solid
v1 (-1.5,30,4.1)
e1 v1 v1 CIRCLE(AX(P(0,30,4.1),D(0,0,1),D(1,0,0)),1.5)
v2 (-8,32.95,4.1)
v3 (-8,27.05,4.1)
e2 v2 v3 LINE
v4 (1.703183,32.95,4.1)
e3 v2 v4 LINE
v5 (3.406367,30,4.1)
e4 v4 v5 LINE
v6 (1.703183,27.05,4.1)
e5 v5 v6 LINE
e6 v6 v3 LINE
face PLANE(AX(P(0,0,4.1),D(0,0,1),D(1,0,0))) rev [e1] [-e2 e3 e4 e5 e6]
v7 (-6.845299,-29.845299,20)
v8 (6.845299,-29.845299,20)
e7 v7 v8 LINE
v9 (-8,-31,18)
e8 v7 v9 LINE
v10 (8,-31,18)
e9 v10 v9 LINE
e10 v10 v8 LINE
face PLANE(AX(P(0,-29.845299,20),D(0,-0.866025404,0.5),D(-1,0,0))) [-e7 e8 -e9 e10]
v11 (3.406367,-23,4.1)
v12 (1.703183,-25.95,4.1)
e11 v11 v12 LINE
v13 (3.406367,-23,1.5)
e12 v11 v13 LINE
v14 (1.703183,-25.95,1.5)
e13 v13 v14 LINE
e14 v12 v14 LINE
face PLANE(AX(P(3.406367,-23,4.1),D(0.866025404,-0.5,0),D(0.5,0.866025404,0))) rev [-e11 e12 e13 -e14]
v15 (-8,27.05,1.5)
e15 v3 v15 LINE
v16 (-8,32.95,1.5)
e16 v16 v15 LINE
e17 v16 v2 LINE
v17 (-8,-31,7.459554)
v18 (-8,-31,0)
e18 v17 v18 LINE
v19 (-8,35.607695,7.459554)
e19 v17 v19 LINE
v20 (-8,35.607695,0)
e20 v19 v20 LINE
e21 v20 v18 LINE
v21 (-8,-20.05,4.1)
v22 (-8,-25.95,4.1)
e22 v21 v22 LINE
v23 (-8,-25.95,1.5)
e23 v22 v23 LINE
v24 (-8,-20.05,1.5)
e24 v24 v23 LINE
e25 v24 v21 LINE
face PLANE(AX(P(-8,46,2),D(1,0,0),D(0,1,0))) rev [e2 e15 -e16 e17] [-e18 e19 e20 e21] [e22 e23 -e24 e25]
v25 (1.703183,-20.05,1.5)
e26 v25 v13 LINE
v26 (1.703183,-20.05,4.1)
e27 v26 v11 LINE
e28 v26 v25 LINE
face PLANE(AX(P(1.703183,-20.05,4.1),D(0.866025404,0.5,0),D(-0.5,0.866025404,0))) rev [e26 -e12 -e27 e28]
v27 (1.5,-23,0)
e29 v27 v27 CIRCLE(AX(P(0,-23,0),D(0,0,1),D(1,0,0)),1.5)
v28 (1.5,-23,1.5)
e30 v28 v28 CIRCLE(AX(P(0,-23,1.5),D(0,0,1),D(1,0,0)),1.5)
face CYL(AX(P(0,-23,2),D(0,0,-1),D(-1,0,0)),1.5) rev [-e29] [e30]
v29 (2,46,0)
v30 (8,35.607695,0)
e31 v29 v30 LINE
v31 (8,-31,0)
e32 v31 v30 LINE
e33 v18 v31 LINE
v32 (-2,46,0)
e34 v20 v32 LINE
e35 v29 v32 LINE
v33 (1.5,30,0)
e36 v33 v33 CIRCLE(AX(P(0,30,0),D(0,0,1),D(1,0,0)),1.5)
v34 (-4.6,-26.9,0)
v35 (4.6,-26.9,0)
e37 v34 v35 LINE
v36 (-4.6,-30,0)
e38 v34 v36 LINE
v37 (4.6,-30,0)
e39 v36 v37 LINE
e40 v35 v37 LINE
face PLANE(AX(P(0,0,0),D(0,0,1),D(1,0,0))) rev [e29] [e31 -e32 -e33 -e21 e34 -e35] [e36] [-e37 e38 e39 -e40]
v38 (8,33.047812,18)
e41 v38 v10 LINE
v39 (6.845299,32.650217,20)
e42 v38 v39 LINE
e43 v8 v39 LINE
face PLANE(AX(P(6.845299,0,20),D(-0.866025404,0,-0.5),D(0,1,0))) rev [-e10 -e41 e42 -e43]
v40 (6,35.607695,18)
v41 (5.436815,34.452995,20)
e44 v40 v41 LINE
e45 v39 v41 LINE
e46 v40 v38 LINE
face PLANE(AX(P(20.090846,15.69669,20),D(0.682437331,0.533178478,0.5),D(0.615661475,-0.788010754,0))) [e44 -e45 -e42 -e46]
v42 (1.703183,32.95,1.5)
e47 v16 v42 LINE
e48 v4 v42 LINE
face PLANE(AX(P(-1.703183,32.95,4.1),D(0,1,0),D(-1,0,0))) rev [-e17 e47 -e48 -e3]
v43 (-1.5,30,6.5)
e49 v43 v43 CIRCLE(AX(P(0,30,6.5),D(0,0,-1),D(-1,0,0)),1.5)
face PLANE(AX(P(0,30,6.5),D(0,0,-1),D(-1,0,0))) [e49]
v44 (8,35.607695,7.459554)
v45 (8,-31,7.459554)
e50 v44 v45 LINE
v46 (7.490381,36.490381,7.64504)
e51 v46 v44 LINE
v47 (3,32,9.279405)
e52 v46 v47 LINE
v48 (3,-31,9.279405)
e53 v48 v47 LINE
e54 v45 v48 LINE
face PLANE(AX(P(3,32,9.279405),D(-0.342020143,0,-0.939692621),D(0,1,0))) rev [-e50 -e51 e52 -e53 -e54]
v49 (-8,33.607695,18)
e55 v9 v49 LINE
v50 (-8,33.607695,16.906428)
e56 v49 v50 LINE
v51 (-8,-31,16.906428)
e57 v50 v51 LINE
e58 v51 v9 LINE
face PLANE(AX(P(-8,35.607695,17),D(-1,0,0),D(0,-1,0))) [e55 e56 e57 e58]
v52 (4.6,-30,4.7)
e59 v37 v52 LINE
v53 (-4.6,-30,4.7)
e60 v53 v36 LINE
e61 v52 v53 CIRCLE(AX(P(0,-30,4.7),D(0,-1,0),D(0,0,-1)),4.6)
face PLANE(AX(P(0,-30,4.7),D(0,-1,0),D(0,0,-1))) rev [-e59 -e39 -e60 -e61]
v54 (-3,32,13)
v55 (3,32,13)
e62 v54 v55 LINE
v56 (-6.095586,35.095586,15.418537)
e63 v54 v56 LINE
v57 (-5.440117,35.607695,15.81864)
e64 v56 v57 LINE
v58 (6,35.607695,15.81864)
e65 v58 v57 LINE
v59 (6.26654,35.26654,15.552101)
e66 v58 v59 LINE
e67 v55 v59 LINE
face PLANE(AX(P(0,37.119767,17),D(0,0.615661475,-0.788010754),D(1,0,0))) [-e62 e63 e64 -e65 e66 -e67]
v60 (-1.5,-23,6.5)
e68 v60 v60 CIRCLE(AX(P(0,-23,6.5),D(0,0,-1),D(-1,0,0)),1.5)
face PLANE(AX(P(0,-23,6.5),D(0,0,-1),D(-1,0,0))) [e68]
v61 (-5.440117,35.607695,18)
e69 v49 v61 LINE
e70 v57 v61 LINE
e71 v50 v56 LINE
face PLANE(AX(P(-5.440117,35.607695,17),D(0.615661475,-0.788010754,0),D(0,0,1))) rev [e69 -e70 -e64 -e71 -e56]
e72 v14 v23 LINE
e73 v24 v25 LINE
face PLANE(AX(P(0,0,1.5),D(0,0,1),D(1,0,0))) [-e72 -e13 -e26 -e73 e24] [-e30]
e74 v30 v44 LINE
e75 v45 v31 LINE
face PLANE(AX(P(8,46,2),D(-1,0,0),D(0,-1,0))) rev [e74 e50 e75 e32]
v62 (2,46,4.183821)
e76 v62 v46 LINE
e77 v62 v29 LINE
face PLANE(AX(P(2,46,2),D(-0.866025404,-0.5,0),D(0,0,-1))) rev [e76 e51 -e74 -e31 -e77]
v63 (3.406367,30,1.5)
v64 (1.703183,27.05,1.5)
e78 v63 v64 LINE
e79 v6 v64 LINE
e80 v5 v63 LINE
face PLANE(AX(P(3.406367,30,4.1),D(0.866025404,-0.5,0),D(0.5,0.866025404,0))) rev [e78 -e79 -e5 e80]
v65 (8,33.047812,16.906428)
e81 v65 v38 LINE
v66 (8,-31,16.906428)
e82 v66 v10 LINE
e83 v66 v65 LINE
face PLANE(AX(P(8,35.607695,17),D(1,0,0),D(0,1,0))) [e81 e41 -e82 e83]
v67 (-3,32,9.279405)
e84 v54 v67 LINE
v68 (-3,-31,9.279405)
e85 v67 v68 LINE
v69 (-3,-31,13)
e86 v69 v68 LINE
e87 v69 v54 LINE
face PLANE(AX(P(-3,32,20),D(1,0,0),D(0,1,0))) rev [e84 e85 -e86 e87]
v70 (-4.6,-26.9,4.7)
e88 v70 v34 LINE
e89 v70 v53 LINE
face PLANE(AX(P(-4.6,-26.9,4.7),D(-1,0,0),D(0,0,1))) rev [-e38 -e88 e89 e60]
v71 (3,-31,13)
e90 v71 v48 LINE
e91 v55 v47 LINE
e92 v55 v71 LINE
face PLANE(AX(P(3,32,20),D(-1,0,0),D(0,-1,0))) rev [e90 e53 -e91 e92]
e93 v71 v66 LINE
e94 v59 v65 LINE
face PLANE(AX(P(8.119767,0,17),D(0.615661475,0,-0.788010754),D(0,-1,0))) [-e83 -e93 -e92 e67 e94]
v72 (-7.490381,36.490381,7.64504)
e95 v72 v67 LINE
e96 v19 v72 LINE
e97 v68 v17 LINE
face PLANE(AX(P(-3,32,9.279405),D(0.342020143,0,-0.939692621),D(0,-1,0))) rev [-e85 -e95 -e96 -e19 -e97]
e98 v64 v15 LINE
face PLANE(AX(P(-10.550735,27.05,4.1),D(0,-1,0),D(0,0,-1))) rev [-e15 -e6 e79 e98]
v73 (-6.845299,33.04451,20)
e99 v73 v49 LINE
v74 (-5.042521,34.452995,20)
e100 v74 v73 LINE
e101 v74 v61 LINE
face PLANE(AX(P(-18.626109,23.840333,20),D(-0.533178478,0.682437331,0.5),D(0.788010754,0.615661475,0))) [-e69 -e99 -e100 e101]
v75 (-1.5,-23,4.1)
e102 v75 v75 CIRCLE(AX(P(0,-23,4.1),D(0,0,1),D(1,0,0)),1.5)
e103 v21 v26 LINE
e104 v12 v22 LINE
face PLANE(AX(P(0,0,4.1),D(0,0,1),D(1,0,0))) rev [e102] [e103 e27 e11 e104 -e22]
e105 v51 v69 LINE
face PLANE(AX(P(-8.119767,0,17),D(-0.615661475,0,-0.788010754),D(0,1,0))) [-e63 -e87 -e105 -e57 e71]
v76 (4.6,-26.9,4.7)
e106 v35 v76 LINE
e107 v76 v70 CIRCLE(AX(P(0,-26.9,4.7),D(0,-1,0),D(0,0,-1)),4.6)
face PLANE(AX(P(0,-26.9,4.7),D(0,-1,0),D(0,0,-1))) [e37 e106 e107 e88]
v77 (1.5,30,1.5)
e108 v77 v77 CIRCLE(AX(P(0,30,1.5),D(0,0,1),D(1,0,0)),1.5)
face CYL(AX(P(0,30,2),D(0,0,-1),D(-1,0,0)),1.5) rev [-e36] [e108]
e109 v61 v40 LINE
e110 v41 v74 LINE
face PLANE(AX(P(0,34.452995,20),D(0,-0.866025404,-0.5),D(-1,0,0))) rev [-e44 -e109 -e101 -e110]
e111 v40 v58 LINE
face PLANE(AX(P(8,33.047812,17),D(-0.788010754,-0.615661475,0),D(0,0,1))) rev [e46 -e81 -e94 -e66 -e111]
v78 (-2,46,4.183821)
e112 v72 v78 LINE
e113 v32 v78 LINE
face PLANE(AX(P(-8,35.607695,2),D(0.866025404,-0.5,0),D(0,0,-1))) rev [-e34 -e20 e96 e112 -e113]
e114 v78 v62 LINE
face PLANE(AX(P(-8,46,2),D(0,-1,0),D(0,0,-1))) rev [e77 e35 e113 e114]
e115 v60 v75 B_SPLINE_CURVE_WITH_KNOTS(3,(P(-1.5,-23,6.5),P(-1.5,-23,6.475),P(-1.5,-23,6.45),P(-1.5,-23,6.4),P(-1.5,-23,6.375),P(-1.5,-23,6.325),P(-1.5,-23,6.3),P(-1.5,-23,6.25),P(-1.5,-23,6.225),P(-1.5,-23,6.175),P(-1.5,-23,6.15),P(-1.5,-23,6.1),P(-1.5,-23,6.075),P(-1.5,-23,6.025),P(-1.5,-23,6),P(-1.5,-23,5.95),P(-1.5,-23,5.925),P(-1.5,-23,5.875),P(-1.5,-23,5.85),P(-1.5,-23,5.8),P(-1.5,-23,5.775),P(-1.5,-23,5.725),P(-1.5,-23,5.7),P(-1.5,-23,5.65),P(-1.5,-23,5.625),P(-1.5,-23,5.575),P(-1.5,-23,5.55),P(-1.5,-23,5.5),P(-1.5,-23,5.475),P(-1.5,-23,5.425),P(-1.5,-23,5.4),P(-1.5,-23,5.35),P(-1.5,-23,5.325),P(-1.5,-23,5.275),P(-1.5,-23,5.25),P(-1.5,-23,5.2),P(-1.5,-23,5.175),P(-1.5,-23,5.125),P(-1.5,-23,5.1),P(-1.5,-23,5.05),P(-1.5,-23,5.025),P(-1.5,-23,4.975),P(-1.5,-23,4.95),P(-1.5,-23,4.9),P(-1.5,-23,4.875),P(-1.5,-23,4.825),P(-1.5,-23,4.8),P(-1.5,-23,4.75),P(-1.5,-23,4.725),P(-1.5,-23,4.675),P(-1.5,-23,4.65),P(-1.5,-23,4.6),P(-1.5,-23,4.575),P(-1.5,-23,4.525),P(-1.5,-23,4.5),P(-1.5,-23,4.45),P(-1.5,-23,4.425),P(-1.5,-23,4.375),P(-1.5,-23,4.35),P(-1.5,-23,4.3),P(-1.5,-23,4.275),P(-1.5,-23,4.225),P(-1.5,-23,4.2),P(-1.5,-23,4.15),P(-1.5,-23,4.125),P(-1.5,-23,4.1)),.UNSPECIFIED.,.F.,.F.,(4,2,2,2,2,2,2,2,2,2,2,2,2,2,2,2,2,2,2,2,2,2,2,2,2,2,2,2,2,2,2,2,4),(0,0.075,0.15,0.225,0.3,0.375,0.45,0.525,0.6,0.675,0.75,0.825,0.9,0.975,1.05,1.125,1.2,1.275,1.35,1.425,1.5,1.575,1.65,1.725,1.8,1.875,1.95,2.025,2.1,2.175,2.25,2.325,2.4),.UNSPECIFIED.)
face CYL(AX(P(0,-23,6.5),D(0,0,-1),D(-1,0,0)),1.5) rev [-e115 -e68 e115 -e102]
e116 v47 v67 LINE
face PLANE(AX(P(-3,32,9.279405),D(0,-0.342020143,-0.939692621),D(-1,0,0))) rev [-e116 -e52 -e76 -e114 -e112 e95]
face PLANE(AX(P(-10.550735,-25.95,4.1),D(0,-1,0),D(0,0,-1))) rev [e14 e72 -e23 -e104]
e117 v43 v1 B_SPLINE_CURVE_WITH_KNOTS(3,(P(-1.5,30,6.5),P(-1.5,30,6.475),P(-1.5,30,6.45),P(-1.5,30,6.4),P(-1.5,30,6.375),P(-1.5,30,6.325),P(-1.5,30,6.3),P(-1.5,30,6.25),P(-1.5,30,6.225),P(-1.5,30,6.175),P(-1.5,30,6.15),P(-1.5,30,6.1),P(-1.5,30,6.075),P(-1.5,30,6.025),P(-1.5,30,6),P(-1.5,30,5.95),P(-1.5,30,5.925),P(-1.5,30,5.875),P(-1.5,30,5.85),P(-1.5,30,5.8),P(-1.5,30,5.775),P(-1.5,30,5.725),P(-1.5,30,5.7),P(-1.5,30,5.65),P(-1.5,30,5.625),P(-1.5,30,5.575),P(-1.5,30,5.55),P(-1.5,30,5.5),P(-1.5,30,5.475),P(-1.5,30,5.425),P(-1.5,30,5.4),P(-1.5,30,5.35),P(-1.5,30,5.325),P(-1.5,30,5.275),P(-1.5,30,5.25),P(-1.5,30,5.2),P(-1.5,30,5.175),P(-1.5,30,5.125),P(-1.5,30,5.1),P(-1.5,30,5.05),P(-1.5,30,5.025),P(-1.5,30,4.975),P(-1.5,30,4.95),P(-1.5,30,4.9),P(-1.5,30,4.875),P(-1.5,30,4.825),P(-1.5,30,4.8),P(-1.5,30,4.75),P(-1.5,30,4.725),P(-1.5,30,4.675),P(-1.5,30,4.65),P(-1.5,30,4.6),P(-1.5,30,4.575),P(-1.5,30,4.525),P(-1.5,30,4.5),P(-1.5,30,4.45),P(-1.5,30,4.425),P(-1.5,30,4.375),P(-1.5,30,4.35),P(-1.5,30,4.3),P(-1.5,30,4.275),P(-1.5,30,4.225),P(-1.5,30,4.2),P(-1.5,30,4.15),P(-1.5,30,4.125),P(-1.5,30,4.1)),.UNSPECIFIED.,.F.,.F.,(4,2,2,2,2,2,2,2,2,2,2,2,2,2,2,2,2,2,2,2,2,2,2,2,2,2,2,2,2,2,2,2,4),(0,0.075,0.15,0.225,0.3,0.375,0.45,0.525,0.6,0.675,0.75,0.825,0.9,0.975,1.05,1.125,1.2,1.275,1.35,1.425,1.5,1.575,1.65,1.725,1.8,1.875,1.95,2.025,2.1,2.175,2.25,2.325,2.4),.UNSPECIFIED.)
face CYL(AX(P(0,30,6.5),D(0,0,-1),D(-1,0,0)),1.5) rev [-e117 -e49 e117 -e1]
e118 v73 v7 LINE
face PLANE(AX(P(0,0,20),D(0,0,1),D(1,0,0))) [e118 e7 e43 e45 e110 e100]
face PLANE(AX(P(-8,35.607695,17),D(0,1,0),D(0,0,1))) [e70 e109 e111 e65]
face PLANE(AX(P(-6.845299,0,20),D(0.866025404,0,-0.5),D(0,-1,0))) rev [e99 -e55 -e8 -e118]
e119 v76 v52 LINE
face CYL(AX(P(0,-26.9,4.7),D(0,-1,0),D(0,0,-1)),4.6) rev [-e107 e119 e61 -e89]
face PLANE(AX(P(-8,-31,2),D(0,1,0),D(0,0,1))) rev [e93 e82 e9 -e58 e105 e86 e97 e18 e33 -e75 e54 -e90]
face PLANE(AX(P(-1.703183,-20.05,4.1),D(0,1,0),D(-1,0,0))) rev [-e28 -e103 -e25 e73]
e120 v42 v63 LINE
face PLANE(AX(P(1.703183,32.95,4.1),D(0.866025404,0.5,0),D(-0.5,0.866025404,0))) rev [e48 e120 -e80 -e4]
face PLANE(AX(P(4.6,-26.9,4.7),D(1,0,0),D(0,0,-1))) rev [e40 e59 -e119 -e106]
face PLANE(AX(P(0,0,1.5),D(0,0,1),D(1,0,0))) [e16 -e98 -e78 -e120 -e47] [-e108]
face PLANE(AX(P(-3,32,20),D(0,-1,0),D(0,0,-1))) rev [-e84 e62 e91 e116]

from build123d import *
from OCP.BRepFilletAPI import BRepFilletAPI_MakeChamfer

# Parameters (mm, degrees)
SKETCH1_W           = 16
SKETCH1_H           = 77
SKETCH1_R           = 1.5
BOSS_EXTRUDE1_DEPTH = 2
CHAMFER1_SIZE       = 6
CHAMFER1_SIZE2      = 10.392304845
SKETCH2_W           = 6
SKETCH2_H           = 63
BOSS_EXTRUDE2_DEPTH = 18
CHAMFER2_SIZE       = 20
CHAMFER2_SIZE_2     = 7.279404685
SKETCH3_W           = 16
SKETCH3_H           = 66.607695155
BOSS_EXTRUDE3_DEPTH = 3
CHAMFER3_SIZE       = 5.119766529
CHAMFER3_SIZE_2     = 4
CHAMFER4_SIZE       = 2
CHAMFER4_SIZE2      = 2.559883264
CHAMFER6_SIZE       = 2
CHAMFER6_SIZE2      = 1.154700538
CUT_EXTRUDE1_DEPTH  = 2.6
CUT_EXTRUDE3_DEPTH  = 3.1
SKETCH9_R           = 1.5
CUT_EXTRUDE_3_DEPTH = 6.5


with BuildPart() as part:
    # Sketch1 → Boss-Extrude1 (new body)
    with BuildSketch(Plane.XY):
        with Locations((0, 7.5)):
            Rectangle(SKETCH1_W, SKETCH1_H)
        with Locations((0, 30)):
            Circle(SKETCH1_R, mode=Mode.SUBTRACT)
        with Locations((0, -23)):
            Circle(SKETCH1_R, mode=Mode.SUBTRACT)
    extrude(amount=BOSS_EXTRUDE1_DEPTH)

    # Chamfer1
    chamfer1_edges = [part.edges().sort_by_distance(p)[0] for p in [
        (-8, 46, 1),
        (8, 46, 1),
    ]]
    chamfer1_side = [part.faces().sort_by_distance(p)[0] for p in [
        (0, 46, 1),
    ]]
    chamfer(chamfer1_edges, length=CHAMFER1_SIZE, length2=CHAMFER1_SIZE2, reference=chamfer1_side[0])

    # Sketch2 → Boss-Extrude2 (add)
    with BuildSketch(Plane.XY.offset(2)):
        with Locations((0, 0.5)):
            Rectangle(SKETCH2_W, SKETCH2_H)
    extrude(amount=BOSS_EXTRUDE2_DEPTH)

    # Chamfer2
    # the kernel refuses this chamfer: 20, 7.279404685 mm, written as the material it adds along each edge
    with BuildSketch(Plane(origin=(3, 32, 2), x_dir=(0.9999130865277317, 0, -0.013184058198645935), z_dir=(0, -1, 0))) as chamfer2_piece_1_section:
        Polygon((CHAMFER2_SIZE * 0.999913086528, CHAMFER2_SIZE * 0.0131840581986), (-CHAMFER2_SIZE_2 * 0.0131840581992, CHAMFER2_SIZE_2 * 0.999913086572), (0, 0), align=None)
    chamfer2_piece_1 = extrude(amount=63, mode=Mode.PRIVATE)
    chamfer2_piece_1 = split(chamfer2_piece_1, bisect_by=Plane(origin=(8, 0.5, 5.171623494), z_dir=(-1, 0, 0)), keep=Keep.TOP, mode=Mode.PRIVATE)
    add(chamfer2_piece_1)
    with BuildSketch(Plane(origin=(-3, -31, 2), x_dir=(-0.9999130865277317, 0, -0.013184058198645935), z_dir=(0, 1, 0))) as chamfer2_piece_2_section:
        Polygon((CHAMFER2_SIZE * 0.999913086528, CHAMFER2_SIZE * 0.0131840581986), (-CHAMFER2_SIZE_2 * 0.0131840581992, CHAMFER2_SIZE_2 * 0.999913086572), (0, 0), align=None)
    chamfer2_piece_2 = extrude(amount=63, mode=Mode.PRIVATE)
    chamfer2_piece_2 = split(chamfer2_piece_2, bisect_by=Plane(origin=(-8, 0.5, 5.171623494), z_dir=(1, 0, 0)), keep=Keep.TOP, mode=Mode.PRIVATE)
    add(chamfer2_piece_2)
    with BuildSketch(Plane(origin=(-3, 32, 2), x_dir=(0, 0.9999130865277315, -0.01318405819864593), z_dir=(1, 0, 0))) as chamfer2_piece_3_section:
        Polygon((CHAMFER2_SIZE * 0.999913086528, CHAMFER2_SIZE * 0.0131840581986), (-CHAMFER2_SIZE_2 * 0.0131840581992, CHAMFER2_SIZE_2 * 0.999913086572), (0, 0), align=None)
    chamfer2_piece_3 = extrude(amount=6, mode=Mode.PRIVATE)
    chamfer2_piece_3 = split(chamfer2_piece_3, bisect_by=Plane(origin=(0, 46, 4.508624661), z_dir=(0, -1, 0)), keep=Keep.TOP, mode=Mode.PRIVATE)
    chamfer2_piece_3 = split(chamfer2_piece_3, bisect_by=Plane(origin=(-5.203873062, 40.450729076, 4.508624661), z_dir=(0.8660254037844399, -0.49999999999999795, 0)), keep=Keep.TOP, mode=Mode.PRIVATE)
    chamfer2_piece_3 = split(chamfer2_piece_3, bisect_by=Plane(origin=(5.203873062, 40.450729076, 4.508624661), z_dir=(-0.8660254037844398, -0.499999999999998, 0)), keep=Keep.TOP, mode=Mode.PRIVATE)
    add(chamfer2_piece_3)
    with BuildSketch(Plane(origin=(-3, 32, 2), x_dir=(0, 0.9999130865277315, -0.01318405819864593), z_dir=(1, 0, 0))) as chamfer2_piece_4a_section:
        Polygon((CHAMFER2_SIZE * 0.999913086528, CHAMFER2_SIZE * 0.0131840581986), (-CHAMFER2_SIZE_2 * 0.0131840581992, CHAMFER2_SIZE_2 * 0.999913086572), (0, 0), align=None)
    chamfer2_piece_4a = extrude(amount=57.883894651, mode=Mode.PRIVATE)
    chamfer2_piece_4a = split(chamfer2_piece_4a, bisect_by=Plane(origin=(7.316315987, 36.791870601, 4.879553829), z_dir=(-0.8660254037844398, -0.499999999999998, 0)), keep=Keep.TOP, mode=Mode.PRIVATE)
    chamfer2_piece_4a = split(chamfer2_piece_4a, bisect_by=Plane(origin=(8, 35.552510025, 4.879553829), z_dir=(-1, 0, 0)), keep=Keep.TOP, mode=Mode.PRIVATE)
    chamfer2_piece_4a = split(chamfer2_piece_4a, bisect_by=Plane(origin=(3, 35.552510025, 4.879553829), z_dir=(1, 0, 0)), keep=Keep.TOP, mode=Mode.PRIVATE)
    with BuildSketch(Plane(origin=(3, 83.883894651, 2), x_dir=(0.9999130865277317, 0, -0.013184058198645935), z_dir=(0, -1, 0))) as chamfer2_piece_4b_section:
        Polygon((CHAMFER2_SIZE * 0.999913086528, CHAMFER2_SIZE * 0.0131840581986), (-CHAMFER2_SIZE_2 * 0.0131840581992, CHAMFER2_SIZE_2 * 0.999913086572), (0, 0), align=None)
    chamfer2_piece_4b = extrude(amount=114.883894651, mode=Mode.PRIVATE)
    chamfer2_piece_4b = split(chamfer2_piece_4b, bisect_by=Plane(origin=(6.651088561, 37.944078302, 5.319791994), z_dir=(-0.8660254037844398, -0.499999999999998, 0)), keep=Keep.TOP, mode=Mode.PRIVATE)
    chamfer2_piece_4b = split(chamfer2_piece_4b, bisect_by=Plane(origin=(8, 36.755262641, 5.319791994), z_dir=(-1, 0, 0)), keep=Keep.TOP, mode=Mode.PRIVATE)
    chamfer2_piece_4b = split(chamfer2_piece_4b, bisect_by=Plane(origin=(4.591999436, 32, 5.319791994), z_dir=(0, 1, 0)), keep=Keep.TOP, mode=Mode.PRIVATE)
    chamfer2_piece_4 = chamfer2_piece_4a & chamfer2_piece_4b
    add(chamfer2_piece_4)
    with BuildSketch(Plane(origin=(-3, -31, 2), x_dir=(-0.9999130865277317, 0, -0.013184058198645935), z_dir=(0, 1, 0))) as chamfer2_piece_5a_section:
        Polygon((CHAMFER2_SIZE * 0.999913086528, CHAMFER2_SIZE * 0.0131840581986), (-CHAMFER2_SIZE_2 * 0.0131840581992, CHAMFER2_SIZE_2 * 0.999913086572), (0, 0), align=None)
    chamfer2_piece_5a = extrude(amount=114.883894651, mode=Mode.PRIVATE)
    chamfer2_piece_5a = split(chamfer2_piece_5a, bisect_by=Plane(origin=(-6.651088561, 37.944078302, 5.319791994), z_dir=(0.8660254037844399, -0.49999999999999795, 0)), keep=Keep.TOP, mode=Mode.PRIVATE)
    chamfer2_piece_5a = split(chamfer2_piece_5a, bisect_by=Plane(origin=(-8, 36.755262641, 5.319791994), z_dir=(1, 0, 0)), keep=Keep.TOP, mode=Mode.PRIVATE)
    chamfer2_piece_5a = split(chamfer2_piece_5a, bisect_by=Plane(origin=(-4.591999436, 32, 5.319791994), z_dir=(0, 1, 0)), keep=Keep.TOP, mode=Mode.PRIVATE)
    with BuildSketch(Plane(origin=(-54.883894651, 32, 2), x_dir=(0, 0.9999130865277315, -0.01318405819864593), z_dir=(1, 0, 0))) as chamfer2_piece_5b_section:
        Polygon((CHAMFER2_SIZE * 0.999913086528, CHAMFER2_SIZE * 0.0131840581986), (-CHAMFER2_SIZE_2 * 0.0131840581992, CHAMFER2_SIZE_2 * 0.999913086572), (0, 0), align=None)
    chamfer2_piece_5b = extrude(amount=57.883894651, mode=Mode.PRIVATE)
    chamfer2_piece_5b = split(chamfer2_piece_5b, bisect_by=Plane(origin=(-7.316315987, 36.791870601, 4.879553829), z_dir=(0.8660254037844399, -0.49999999999999795, 0)), keep=Keep.TOP, mode=Mode.PRIVATE)
    chamfer2_piece_5b = split(chamfer2_piece_5b, bisect_by=Plane(origin=(-8, 35.552510025, 4.879553829), z_dir=(1, 0, 0)), keep=Keep.TOP, mode=Mode.PRIVATE)
    chamfer2_piece_5b = split(chamfer2_piece_5b, bisect_by=Plane(origin=(-3, 35.552510025, 4.879553829), z_dir=(-1, 0, 0)), keep=Keep.TOP, mode=Mode.PRIVATE)
    chamfer2_piece_5 = chamfer2_piece_5a & chamfer2_piece_5b
    add(chamfer2_piece_5)

    # Sketch3 → Boss-Extrude3 (add)
    with BuildSketch(Plane.XY.offset(20)):
        with Locations((0, 2.303847577)):
            Rectangle(SKETCH3_W, SKETCH3_H)
    extrude(amount=-BOSS_EXTRUDE3_DEPTH)

    # Chamfer3
    # the kernel refuses this chamfer: 5.119766529, 4 mm, written as the material it adds along each edge
    with BuildSketch(Plane(origin=(-3, 32, 17), x_dir=(-0.9997151392093142, 0, 0.023867141339117107), z_dir=(0, -1, 0))) as chamfer3_piece_1_section:
        Polygon((CHAMFER3_SIZE * 0.999715139165, CHAMFER3_SIZE * 0.0238671413381), (-CHAMFER3_SIZE_2 * 0.0238671413391, CHAMFER3_SIZE_2 * 0.999715139209), (0, 0), align=None)
    chamfer3_piece_1 = extrude(amount=63, mode=Mode.PRIVATE)
    chamfer3_piece_1 = split(chamfer3_piece_1, bisect_by=Plane(origin=(-8, 0.5, 15.68735559), z_dir=(1, 0, 0)), keep=Keep.TOP, mode=Mode.PRIVATE)
    add(chamfer3_piece_1)
    with BuildSketch(Plane(origin=(3, -31, 17), x_dir=(-0.03908161918057666, 0, -0.9992360216896831), z_dir=(0, 1, 0))) as chamfer3_piece_2_section:
        Polygon((CHAMFER3_SIZE_2 * 0.99923602169, -CHAMFER3_SIZE_2 * 0.0390816191806), (-CHAMFER3_SIZE * 0.0390816191788, -CHAMFER3_SIZE * 0.999236021645), (0, 0), align=None)
    chamfer3_piece_2 = extrude(amount=63, mode=Mode.PRIVATE)
    chamfer3_piece_2 = split(chamfer3_piece_2, bisect_by=Plane(origin=(8, 0.5, 15.68735559), z_dir=(-1, 0, 0)), keep=Keep.TOP, mode=Mode.PRIVATE)
    add(chamfer3_piece_2)
    with BuildSketch(Plane(origin=(3, 32, 17), x_dir=(0, -0.03908161918057696, -0.9992360216896828), z_dir=(-1, 0, 0))) as chamfer3_piece_3_section:
        Polygon((CHAMFER3_SIZE_2 * 0.99923602169, -CHAMFER3_SIZE_2 * 0.0390816191806), (-CHAMFER3_SIZE * 0.0390816191788, -CHAMFER3_SIZE * 0.999236021645), (0, 0), align=None)
    chamfer3_piece_3 = extrude(amount=6, mode=Mode.PRIVATE)
    chamfer3_piece_3 = split(chamfer3_piece_3, bisect_by=Plane(origin=(0, 35.607695155, 15.575763401), z_dir=(0, -1, 0)), keep=Keep.TOP, mode=Mode.PRIVATE)
    add(chamfer3_piece_3)
    with BuildSketch(Plane(origin=(3, 32, 17), x_dir=(0, -0.03908161918057696, -0.9992360216896828), z_dir=(-1, 0, 0))) as chamfer3_piece_4a_section:
        Polygon((CHAMFER3_SIZE_2 * 0.99923602169, -CHAMFER3_SIZE_2 * 0.0390816191806), (-CHAMFER3_SIZE * 0.0390816191788, -CHAMFER3_SIZE * 0.999236021645), (0, 0), align=None)
    chamfer3_piece_4a = extrude(amount=19.206621479, mode=Mode.PRIVATE)
    chamfer3_piece_4a = split(chamfer3_piece_4a, bisect_by=Plane(origin=(-3, 33.411290687, 15.575763401), z_dir=(-1, 0, 0)), keep=Keep.TOP, mode=Mode.PRIVATE)
    chamfer3_piece_4a = split(chamfer3_piece_4a, bisect_by=Plane(origin=(-8, 33.411290687, 15.575763401), z_dir=(1, 0, 0)), keep=Keep.TOP, mode=Mode.PRIVATE)
    chamfer3_piece_4a = split(chamfer3_piece_4a, bisect_by=Plane(origin=(-5.5, 35.607695155, 15.575763401), z_dir=(0, -1, 0)), keep=Keep.TOP, mode=Mode.PRIVATE)
    with BuildSketch(Plane(origin=(-3, 45.206621479, 17), x_dir=(-0.9997151392093142, 0, 0.023867141339117107), z_dir=(0, -1, 0))) as chamfer3_piece_4b_section:
        Polygon((CHAMFER3_SIZE * 0.999715139165, CHAMFER3_SIZE * 0.0238671413381), (-CHAMFER3_SIZE_2 * 0.0238671413391, CHAMFER3_SIZE_2 * 0.999715139209), (0, 0), align=None)
    chamfer3_piece_4b = extrude(amount=76.206621479, mode=Mode.PRIVATE)
    chamfer3_piece_4b = split(chamfer3_piece_4b, bisect_by=Plane(origin=(-4.682811334, 32, 15.68735559), z_dir=(0, 1, 0)), keep=Keep.TOP, mode=Mode.PRIVATE)
    chamfer3_piece_4b = split(chamfer3_piece_4b, bisect_by=Plane(origin=(-8, 33.803847577, 15.68735559), z_dir=(1, 0, 0)), keep=Keep.TOP, mode=Mode.PRIVATE)
    chamfer3_piece_4b = split(chamfer3_piece_4b, bisect_by=Plane(origin=(-4.682811334, 35.607695155, 15.68735559), z_dir=(0, -1, 0)), keep=Keep.TOP, mode=Mode.PRIVATE)
    chamfer3_piece_4 = chamfer3_piece_4a & chamfer3_piece_4b
    add(chamfer3_piece_4)
    with BuildSketch(Plane(origin=(3, -31, 17), x_dir=(-0.03908161918057666, 0, -0.9992360216896831), z_dir=(0, 1, 0))) as chamfer3_piece_5a_section:
        Polygon((CHAMFER3_SIZE_2 * 0.99923602169, -CHAMFER3_SIZE_2 * 0.0390816191806), (-CHAMFER3_SIZE * 0.0390816191788, -CHAMFER3_SIZE * 0.999236021645), (0, 0), align=None)
    chamfer3_piece_5a = extrude(amount=76.206621479, mode=Mode.PRIVATE)
    chamfer3_piece_5a = split(chamfer3_piece_5a, bisect_by=Plane(origin=(4.682811334, 32, 15.68735559), z_dir=(0, 1, 0)), keep=Keep.TOP, mode=Mode.PRIVATE)
    chamfer3_piece_5a = split(chamfer3_piece_5a, bisect_by=Plane(origin=(8, 33.803847577, 15.68735559), z_dir=(-1, 0, 0)), keep=Keep.TOP, mode=Mode.PRIVATE)
    chamfer3_piece_5a = split(chamfer3_piece_5a, bisect_by=Plane(origin=(4.682811334, 35.607695155, 15.68735559), z_dir=(0, -1, 0)), keep=Keep.TOP, mode=Mode.PRIVATE)
    with BuildSketch(Plane(origin=(16.206621479, 32, 17), x_dir=(0, -0.039081619180576975, -0.9992360216896828), z_dir=(-1, 0, 0))) as chamfer3_piece_5b_section:
        Polygon((CHAMFER3_SIZE_2 * 0.99923602169, -CHAMFER3_SIZE_2 * 0.0390816191806), (-CHAMFER3_SIZE * 0.0390816191788, -CHAMFER3_SIZE * 0.999236021645), (0, 0), align=None)
    chamfer3_piece_5b = extrude(amount=19.206621479, mode=Mode.PRIVATE)
    chamfer3_piece_5b = split(chamfer3_piece_5b, bisect_by=Plane(origin=(3, 33.411290687, 15.575763401), z_dir=(1, 0, 0)), keep=Keep.TOP, mode=Mode.PRIVATE)
    chamfer3_piece_5b = split(chamfer3_piece_5b, bisect_by=Plane(origin=(8, 33.411290687, 15.575763401), z_dir=(-1, 0, 0)), keep=Keep.TOP, mode=Mode.PRIVATE)
    chamfer3_piece_5b = split(chamfer3_piece_5b, bisect_by=Plane(origin=(5.5, 35.607695155, 15.575763401), z_dir=(0, -1, 0)), keep=Keep.TOP, mode=Mode.PRIVATE)
    chamfer3_piece_5 = chamfer3_piece_5a & chamfer3_piece_5b
    add(chamfer3_piece_5)

    # Chamfer4: one chamfer whose edges measure the first distance from different faces: ONE call of the kernel's chamfer builder (chamfer() names one face for all edges)
    chamfer4_edges_1 = [part.edges().sort_by_distance(p)[0] for p in [
        (8, 35.607695155, 18.453214066),
    ]]
    chamfer4_side_1 = [part.faces().sort_by_distance(p)[0] for p in [
        (0, 35.607695155, 17.949346945),
    ]]
    chamfer4_edges_2 = [part.edges().sort_by_distance(p)[0] for p in [
        (-8, 35.607695155, 18.453214066),
    ]]
    chamfer4_side_2 = [part.faces().sort_by_distance(p)[0] for p in [
        (-8, 2.303847577, 18.453214066),
    ]]
    chamfer4 = BRepFilletAPI_MakeChamfer(part.part.solid().wrapped)
    for e in chamfer4_edges_1:
        chamfer4.Add(CHAMFER4_SIZE, CHAMFER4_SIZE2, e.wrapped, chamfer4_side_1[0].wrapped)  # the first distance lies on this face
    for e in chamfer4_edges_2:
        chamfer4.Add(CHAMFER4_SIZE, CHAMFER4_SIZE2, e.wrapped, chamfer4_side_2[0].wrapped)  # the first distance lies on this face
    add(Compound.cast(chamfer4.Shape()), mode=Mode.REPLACE)

    # Chamfer6: one chamfer whose edges measure the first distance from different faces: ONE call of the kernel's chamfer builder (chamfer() names one face for all edges)
    chamfer6_edges_1 = [part.edges().sort_by_distance(p)[0] for p in [
        (0.279941632, 35.607695155, 20),
    ]]
    chamfer6_side_1 = [part.faces().sort_by_distance(p)[0] for p in [
        (0.279941632, 35.607695155, 17.909320185),
    ]]
    chamfer6_edges_2 = [part.edges().sort_by_distance(p)[0] for p in [
        (-8, 1.303847577, 20),
    ]]
    chamfer6_side_2 = [part.faces().sort_by_distance(p)[0] for p in [
        (-8, 1.303847577, 18.453214066),
    ]]
    chamfer6_edges_3 = [part.edges().sort_by_distance(p)[0] for p in [
        (-6.720058368, 34.607695155, 20),
    ]]
    chamfer6_side_3 = [part.faces().sort_by_distance(p)[0] for p in [
        (-6.643946015, 34.667160642, 17.986837594),
    ]]
    chamfer6_edges_4 = [part.edges().sort_by_distance(p)[0] for p in [
        (7, 34.327753522, 20),
    ]]
    chamfer6_side_4 = [part.faces().sort_by_distance(p)[0] for p in [
        (6.939737458, 34.404886058, 18.056606172),
    ]]
    chamfer6_edges_5 = [part.edges().sort_by_distance(p)[0] for p in [
        (0, -31, 20),
    ]]
    chamfer6_side_5 = [part.faces().sort_by_distance(p)[0] for p in [
        (0, -31, 9.550063224),
    ]]
    chamfer6_edges_6 = [part.edges().sort_by_distance(p)[0] for p in [
        (8, 1.023905945, 20),
    ]]
    chamfer6_side_6 = [part.faces().sort_by_distance(p)[0] for p in [
        (8, 1.023905945, 18.453214066),
    ]]
    chamfer6 = BRepFilletAPI_MakeChamfer(part.part.solid().wrapped)
    for e in chamfer6_edges_1:
        chamfer6.Add(CHAMFER6_SIZE, CHAMFER6_SIZE2, e.wrapped, chamfer6_side_1[0].wrapped)  # the first distance lies on this face
    for e in chamfer6_edges_2:
        chamfer6.Add(CHAMFER6_SIZE, CHAMFER6_SIZE2, e.wrapped, chamfer6_side_2[0].wrapped)  # the first distance lies on this face
    for e in chamfer6_edges_3:
        chamfer6.Add(CHAMFER6_SIZE, CHAMFER6_SIZE2, e.wrapped, chamfer6_side_3[0].wrapped)  # the first distance lies on this face
    for e in chamfer6_edges_4:
        chamfer6.Add(CHAMFER6_SIZE, CHAMFER6_SIZE2, e.wrapped, chamfer6_side_4[0].wrapped)  # the first distance lies on this face
    for e in chamfer6_edges_5:
        chamfer6.Add(CHAMFER6_SIZE, CHAMFER6_SIZE2, e.wrapped, chamfer6_side_5[0].wrapped)  # the first distance lies on this face
    for e in chamfer6_edges_6:
        chamfer6.Add(CHAMFER6_SIZE, CHAMFER6_SIZE2, e.wrapped, chamfer6_side_6[0].wrapped)  # the first distance lies on this face
    add(Compound.cast(chamfer6.Shape()), mode=Mode.REPLACE)

    # Sketch4 → Cut-Extrude1 (cut)
    with BuildSketch(Plane(origin=(0, 0, 1.5), x_dir=(-1, 0, 0), z_dir=(0, 0, -1))):
        Polygon((1.703183294, 32.95), (-1.703183294, 32.95), (-3.406366588, 30), (-1.703183294, 27.05), (1.703183294, 27.05), (10.550735488, 27.05), (10.550735488, 32.95), align=None)
        Polygon((1.703183294, -20.05), (-1.703183294, -20.05), (-3.406366588, -23), (-1.703183294, -25.95), (1.703183294, -25.95), (10.550735488, -25.95), (10.550735488, -20.05), align=None)
    extrude(amount=-CUT_EXTRUDE1_DEPTH, mode=Mode.SUBTRACT)

    # Sketch8 → Cut-Extrude3 (cut)
    with BuildSketch(Plane(origin=(0, -30, 0), x_dir=(-1, 0, 0), z_dir=(0, -1, 0))):
        with BuildLine():
            Line((-4.6, -4.7), (-4.6, 0))
            Line((-4.6, 0), (4.6, 0))
            Line((4.6, 0), (4.6, -4.7))
            ThreePointArc((4.6, -4.7), (0, -9.3), (-4.6, -4.7))
        make_face()
    extrude(amount=-CUT_EXTRUDE3_DEPTH, mode=Mode.SUBTRACT)

    # Sketch9 → Cut-Extrude 3 (cut)
    with BuildSketch(Plane(origin=(0, 0, 0), x_dir=(-1, 0, 0), z_dir=(0, 0, -1))):
        with Locations(Location((0, 30, 0), (0, 0, 180))):
            Circle(SKETCH9_R)
        with Locations(Location((0, -23, 0), (0, 0, 180))):
            Circle(SKETCH9_R)
    extrude(amount=-CUT_EXTRUDE_3_DEPTH, mode=Mode.SUBTRACT)


solid = part.part
